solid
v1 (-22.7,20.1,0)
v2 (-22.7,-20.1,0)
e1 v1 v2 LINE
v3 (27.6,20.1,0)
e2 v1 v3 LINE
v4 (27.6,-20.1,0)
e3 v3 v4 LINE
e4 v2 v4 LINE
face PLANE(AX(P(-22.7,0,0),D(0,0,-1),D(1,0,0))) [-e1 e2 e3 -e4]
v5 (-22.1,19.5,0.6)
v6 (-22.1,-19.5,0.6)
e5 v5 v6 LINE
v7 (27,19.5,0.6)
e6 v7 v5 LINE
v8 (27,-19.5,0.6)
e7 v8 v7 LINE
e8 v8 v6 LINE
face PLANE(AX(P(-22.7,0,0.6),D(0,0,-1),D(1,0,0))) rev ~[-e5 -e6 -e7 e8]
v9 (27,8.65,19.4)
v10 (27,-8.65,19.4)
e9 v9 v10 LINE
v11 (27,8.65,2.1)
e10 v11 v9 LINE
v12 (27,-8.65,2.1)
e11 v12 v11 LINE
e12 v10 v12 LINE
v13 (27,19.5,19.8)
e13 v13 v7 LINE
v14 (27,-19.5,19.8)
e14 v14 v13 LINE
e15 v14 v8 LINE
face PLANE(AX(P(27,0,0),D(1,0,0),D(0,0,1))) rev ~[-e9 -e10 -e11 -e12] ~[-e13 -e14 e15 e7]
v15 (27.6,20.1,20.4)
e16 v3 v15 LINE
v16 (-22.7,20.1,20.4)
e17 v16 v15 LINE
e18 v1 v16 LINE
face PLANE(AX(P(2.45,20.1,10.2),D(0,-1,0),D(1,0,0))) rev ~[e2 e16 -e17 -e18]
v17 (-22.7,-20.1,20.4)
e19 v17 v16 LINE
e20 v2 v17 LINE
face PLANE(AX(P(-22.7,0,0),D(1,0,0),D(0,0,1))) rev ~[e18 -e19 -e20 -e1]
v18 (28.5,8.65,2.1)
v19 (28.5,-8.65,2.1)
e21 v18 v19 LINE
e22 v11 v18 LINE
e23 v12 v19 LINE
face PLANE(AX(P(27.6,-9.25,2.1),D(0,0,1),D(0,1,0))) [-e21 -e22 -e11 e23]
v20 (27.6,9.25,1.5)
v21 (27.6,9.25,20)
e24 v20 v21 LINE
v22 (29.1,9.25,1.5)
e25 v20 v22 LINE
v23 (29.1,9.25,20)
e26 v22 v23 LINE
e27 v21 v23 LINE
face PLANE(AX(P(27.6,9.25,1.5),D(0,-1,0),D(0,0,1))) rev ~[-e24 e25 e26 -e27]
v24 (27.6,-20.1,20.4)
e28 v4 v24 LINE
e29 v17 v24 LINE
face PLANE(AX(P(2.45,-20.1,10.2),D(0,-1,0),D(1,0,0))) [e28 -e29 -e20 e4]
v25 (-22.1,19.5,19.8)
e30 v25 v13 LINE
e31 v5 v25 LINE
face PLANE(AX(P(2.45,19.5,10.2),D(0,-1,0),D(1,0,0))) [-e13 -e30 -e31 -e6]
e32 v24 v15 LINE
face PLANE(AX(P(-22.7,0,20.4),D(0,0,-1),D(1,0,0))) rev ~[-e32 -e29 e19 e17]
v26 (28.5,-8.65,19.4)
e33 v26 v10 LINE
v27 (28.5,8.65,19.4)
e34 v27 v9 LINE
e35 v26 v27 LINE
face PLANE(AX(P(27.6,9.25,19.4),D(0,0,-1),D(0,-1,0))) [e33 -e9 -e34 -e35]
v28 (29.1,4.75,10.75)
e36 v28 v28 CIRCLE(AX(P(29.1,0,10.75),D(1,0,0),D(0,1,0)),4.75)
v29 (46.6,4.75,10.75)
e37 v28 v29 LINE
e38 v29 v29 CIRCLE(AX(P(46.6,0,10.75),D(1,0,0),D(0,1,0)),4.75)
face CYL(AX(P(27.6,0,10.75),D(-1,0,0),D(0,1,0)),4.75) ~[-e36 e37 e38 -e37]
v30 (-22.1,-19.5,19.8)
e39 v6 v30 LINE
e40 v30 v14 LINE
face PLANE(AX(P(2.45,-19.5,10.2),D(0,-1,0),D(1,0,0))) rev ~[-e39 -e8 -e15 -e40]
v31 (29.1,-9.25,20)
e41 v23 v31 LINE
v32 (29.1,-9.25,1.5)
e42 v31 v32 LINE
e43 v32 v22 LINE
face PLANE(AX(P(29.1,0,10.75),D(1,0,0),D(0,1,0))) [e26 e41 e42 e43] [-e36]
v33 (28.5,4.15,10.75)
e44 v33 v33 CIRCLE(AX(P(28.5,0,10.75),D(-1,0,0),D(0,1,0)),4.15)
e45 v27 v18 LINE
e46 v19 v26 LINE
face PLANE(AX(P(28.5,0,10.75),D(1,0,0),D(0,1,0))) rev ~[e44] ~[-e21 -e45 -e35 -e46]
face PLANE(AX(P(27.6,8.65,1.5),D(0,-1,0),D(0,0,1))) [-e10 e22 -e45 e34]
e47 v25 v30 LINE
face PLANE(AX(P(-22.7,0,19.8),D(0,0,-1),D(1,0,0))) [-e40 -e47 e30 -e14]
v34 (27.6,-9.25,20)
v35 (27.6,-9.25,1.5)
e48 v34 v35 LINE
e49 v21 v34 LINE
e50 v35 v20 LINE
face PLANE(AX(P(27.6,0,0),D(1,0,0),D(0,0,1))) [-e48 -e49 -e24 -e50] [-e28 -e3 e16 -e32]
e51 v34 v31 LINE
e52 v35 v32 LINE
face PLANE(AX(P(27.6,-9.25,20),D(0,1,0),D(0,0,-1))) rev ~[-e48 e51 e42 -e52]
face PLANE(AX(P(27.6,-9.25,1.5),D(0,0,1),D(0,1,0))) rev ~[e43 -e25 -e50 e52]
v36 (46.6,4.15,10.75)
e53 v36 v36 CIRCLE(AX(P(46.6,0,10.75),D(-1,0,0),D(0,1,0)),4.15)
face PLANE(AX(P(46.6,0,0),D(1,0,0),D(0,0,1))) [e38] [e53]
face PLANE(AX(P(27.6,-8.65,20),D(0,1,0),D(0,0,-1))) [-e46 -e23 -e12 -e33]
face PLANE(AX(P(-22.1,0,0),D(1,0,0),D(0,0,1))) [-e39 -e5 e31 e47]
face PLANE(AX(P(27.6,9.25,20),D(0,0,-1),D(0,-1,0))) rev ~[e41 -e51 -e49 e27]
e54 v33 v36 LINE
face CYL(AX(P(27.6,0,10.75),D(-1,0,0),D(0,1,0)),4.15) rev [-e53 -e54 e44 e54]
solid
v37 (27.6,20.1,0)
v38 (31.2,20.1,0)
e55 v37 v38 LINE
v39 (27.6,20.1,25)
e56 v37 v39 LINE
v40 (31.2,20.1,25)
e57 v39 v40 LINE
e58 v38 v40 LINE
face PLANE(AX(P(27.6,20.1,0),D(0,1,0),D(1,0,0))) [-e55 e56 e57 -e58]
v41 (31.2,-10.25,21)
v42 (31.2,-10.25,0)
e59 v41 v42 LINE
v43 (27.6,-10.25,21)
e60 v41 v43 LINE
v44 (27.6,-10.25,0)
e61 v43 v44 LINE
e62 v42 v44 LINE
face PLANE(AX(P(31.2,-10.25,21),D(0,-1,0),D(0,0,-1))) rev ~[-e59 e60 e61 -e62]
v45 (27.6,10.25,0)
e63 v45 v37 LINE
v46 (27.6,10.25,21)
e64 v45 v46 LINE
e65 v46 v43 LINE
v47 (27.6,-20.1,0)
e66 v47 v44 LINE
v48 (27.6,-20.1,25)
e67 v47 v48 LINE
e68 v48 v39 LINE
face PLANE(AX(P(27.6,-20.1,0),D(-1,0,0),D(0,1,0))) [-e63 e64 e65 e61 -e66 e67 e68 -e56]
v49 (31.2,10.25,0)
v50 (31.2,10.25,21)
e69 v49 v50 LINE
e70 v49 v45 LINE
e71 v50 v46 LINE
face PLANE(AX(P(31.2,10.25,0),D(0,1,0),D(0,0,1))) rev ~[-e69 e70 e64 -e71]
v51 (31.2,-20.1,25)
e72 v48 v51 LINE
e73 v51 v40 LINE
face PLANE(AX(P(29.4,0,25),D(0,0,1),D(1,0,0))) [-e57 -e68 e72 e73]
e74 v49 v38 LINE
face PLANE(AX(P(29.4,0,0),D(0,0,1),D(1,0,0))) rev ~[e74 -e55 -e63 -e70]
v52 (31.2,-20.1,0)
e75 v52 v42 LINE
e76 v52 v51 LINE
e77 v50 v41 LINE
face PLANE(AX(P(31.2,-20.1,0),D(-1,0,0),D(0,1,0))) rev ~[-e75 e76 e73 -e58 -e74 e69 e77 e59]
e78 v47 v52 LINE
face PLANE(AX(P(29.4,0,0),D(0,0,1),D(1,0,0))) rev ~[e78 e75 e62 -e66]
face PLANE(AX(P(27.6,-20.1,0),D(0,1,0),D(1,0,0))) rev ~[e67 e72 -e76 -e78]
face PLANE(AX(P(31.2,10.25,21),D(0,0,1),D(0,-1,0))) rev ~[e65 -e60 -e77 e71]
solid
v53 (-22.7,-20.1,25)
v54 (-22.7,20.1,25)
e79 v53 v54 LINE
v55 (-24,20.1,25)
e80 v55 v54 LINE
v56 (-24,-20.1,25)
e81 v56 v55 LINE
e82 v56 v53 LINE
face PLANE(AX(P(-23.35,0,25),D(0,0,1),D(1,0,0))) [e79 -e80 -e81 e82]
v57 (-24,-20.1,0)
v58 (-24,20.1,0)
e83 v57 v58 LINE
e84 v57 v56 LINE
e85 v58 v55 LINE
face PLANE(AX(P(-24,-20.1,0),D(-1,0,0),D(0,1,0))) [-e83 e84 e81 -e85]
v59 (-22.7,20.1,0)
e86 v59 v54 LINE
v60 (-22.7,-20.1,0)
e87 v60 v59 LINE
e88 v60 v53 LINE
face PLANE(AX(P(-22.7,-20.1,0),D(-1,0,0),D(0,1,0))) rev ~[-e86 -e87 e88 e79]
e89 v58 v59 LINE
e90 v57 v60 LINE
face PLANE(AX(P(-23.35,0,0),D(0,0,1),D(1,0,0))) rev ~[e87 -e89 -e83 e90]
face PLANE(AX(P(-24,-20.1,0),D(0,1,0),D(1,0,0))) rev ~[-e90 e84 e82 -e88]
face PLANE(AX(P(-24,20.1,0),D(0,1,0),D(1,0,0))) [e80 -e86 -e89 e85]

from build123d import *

# Parameters (mm, degrees)
F0_W     = 50.3
F0_H     = 20.4
F1_DEPTH = 20.1
F2_R     = 4.75
F3_DEPTH = 1.5
F4_DEPTH = 19
F5_T     = -0.6
F6_W     = 3.6
F6_H     = 40.2
F7_DEPTH = 25
F6_W_2   = 1.3
F9_DEPTH = 3.6


# Not quite as in the source:
# - a feature of the source that left no trace in its solid (it failed there, or was rolled back) is left out


with BuildPart() as f1:
    # F0 (on Front) → F1 (new body, symmetric)
    with BuildSketch(Plane.XZ):
        with Locations((2.45, 10.2)):
            Rectangle(F0_W, F0_H)
    extrude(amount=F1_DEPTH, both=True)

    # F2 (on face) → F3 (join)
    with BuildSketch(Plane.YZ.offset(27.6)):
        Polygon((-9.25, 20), (-9.25, 1.5), (0, 1.5), (9.25, 1.5), (9.25, 20), (0, 20), align=None)
        with Locations((0, 10.75)):
            Circle(F2_R, mode=Mode.SUBTRACT)
    extrude(amount=F3_DEPTH)

    # F4 (add): a face of the model
    f4_faces = [f1.faces().sort_by_distance(p)[0] for p in [
        (27.6, 0, 10.75),
    ]]
    extrude(f4_faces, amount=F4_DEPTH)

    # F5
    f5_openings = [f1.faces().sort_by_distance(p)[0] for p in [
        (46.6, 0, 10.75),
    ]]
    offset(amount=F5_T, openings=f5_openings, kind=Kind.INTERSECTION)


with BuildPart() as f7:
    # F6 (on Top) → F7 (new body)
    with BuildSketch(Plane.XY):
        with Locations((29.4, 0)):
            Rectangle(F6_W, F6_H)
    extrude(amount=F7_DEPTH)

    # F8 (on face) → F9 (cut, through all)
    with BuildSketch(Plane.YZ.offset(31.2)):
        with BuildLine():
            Line((-9.25, 0), (-9.25, 16.108633541))
            ThreePointArc((-9.25, 16.108633541), (-9.7456992731, 16.015473058), (-10.25, 16.0066740906))
            Line((-10.25, 16.0066740906), (-10.25, 0))
            Line((-10.25, 0), (-9.25, 0))
        make_face()
        with BuildLine():
            Line((-9.25, 16.108633541), (-9.25, 20))
            Line((-9.25, 20), (-7.2215728753, 20))
            ThreePointArc((-7.2215728753, 20), (-7.4688611699, 20.5289611963), (-7.8139320225, 21))
            Line((-7.8139320225, 21), (-10.25, 21))
            Line((-10.25, 21), (-10.25, 16.0066740906))
            ThreePointArc((-10.25, 16.0066740906), (-9.7456992731, 16.015473058), (-9.25, 16.108633541))
        make_face()
        with BuildLine():
            ThreePointArc((-7.8139320225, 21), (-7.4688611699, 20.5289611963), (-7.2215728753, 20))
            Line((-7.2215728753, 20), (-2.8284271247, 20))
            ThreePointArc((-2.8284271247, 20), (-2.5811388301, 20.5289611963), (-2.2360679775, 21))
            Line((-2.2360679775, 21), (-7.8139320225, 21))
        make_face()
        with BuildLine():
            Line((-2.8284271247, 20), (-7.2215728753, 20))
            ThreePointArc((-7.2215728753, 20), (-7.093204321, 19.5073059362), (-7.05, 19))
            ThreePointArc((-7.05, 19), (-7.6625327227, 17.1834097875), (-9.25, 16.108633541))
            Line((-9.25, 16.108633541), (-9.25, 0))
            Line((-9.25, 0), (9.25, 0))
            Line((9.25, 0), (9.25, 16.108633541))
            ThreePointArc((9.25, 16.108633541), (7.3897266908, 17.6132967438), (7.2215728753, 20))
            Line((7.2215728753, 20), (2.8284271247, 20))
            ThreePointArc((2.8284271247, 20), (2.956795679, 19.5073059362), (3, 19))
            ThreePointArc((3, 19), (-0.5073059362, 16.043204321), (-2.8284271247, 20))
        make_face()
        with BuildLine():
            Line((9.25, 20), (7.2215728753, 20))
            ThreePointArc((7.2215728753, 20), (7.3897266908, 17.6132967438), (9.25, 16.108633541))
            Line((9.25, 16.108633541), (9.25, 20))
        make_face()
        with BuildLine():
            Line((2.8284271247, 20), (-2.8284271247, 20))
            ThreePointArc((-2.8284271247, 20), (-0.5073059362, 16.043204321), (3, 19))
            ThreePointArc((3, 19), (2.956795679, 19.5073059362), (2.8284271247, 20))
        make_face()
        with BuildLine():
            Line((-7.2215728753, 20), (-9.25, 20))
            Line((-9.25, 20), (-9.25, 16.108633541))
            ThreePointArc((-9.25, 16.108633541), (-7.6625327227, 17.1834097875), (-7.05, 19))
            ThreePointArc((-7.05, 19), (-7.093204321, 19.5073059362), (-7.2215728753, 20))
        make_face()
        with BuildLine():
            Line((9.25, 16.108633541), (9.25, 0))
            Line((9.25, 0), (10.25, 0))
            Line((10.25, 0), (10.25, 16.0066740906))
            ThreePointArc((10.25, 16.0066740906), (9.7456992731, 16.015473058), (9.25, 16.108633541))
        make_face()
        with BuildLine():
            ThreePointArc((7.8139320225, 21), (7.4688611699, 20.5289611963), (7.2215728753, 20))
            Line((7.2215728753, 20), (9.25, 20))
            Line((9.25, 20), (9.25, 16.108633541))
            ThreePointArc((9.25, 16.108633541), (9.7456992731, 16.015473058), (10.25, 16.0066740906))
            Line((10.25, 16.0066740906), (10.25, 21))
            Line((10.25, 21), (7.8139320225, 21))
        make_face()
        with BuildLine():
            ThreePointArc((2.2360679775, 21), (2.5811388301, 20.5289611963), (2.8284271247, 20))
            Line((2.8284271247, 20), (7.2215728753, 20))
            ThreePointArc((7.2215728753, 20), (7.4688611699, 20.5289611963), (7.8139320225, 21))
            Line((7.8139320225, 21), (2.2360679775, 21))
        make_face()
        with BuildLine():
            ThreePointArc((-2.2360679775, 21), (-2.5811388301, 20.5289611963), (-2.8284271247, 20))
            Line((-2.8284271247, 20), (2.8284271247, 20))
            ThreePointArc((2.8284271247, 20), (2.5811388301, 20.5289611963), (2.2360679775, 21))
            Line((2.2360679775, 21), (-2.2360679775, 21))
        make_face()
    extrude(amount=-F9_DEPTH, mode=Mode.SUBTRACT)


with BuildPart() as f7b:
    # F6 (on Top) → F7, piece 2 (new body)
    with BuildSketch(Plane.XY):
        with Locations((-23.35, 0)):
            Rectangle(F6_W_2, F6_H)
    extrude(amount=F7_DEPTH)


solid = Compound([f1.part, f7.part, f7b.part])
